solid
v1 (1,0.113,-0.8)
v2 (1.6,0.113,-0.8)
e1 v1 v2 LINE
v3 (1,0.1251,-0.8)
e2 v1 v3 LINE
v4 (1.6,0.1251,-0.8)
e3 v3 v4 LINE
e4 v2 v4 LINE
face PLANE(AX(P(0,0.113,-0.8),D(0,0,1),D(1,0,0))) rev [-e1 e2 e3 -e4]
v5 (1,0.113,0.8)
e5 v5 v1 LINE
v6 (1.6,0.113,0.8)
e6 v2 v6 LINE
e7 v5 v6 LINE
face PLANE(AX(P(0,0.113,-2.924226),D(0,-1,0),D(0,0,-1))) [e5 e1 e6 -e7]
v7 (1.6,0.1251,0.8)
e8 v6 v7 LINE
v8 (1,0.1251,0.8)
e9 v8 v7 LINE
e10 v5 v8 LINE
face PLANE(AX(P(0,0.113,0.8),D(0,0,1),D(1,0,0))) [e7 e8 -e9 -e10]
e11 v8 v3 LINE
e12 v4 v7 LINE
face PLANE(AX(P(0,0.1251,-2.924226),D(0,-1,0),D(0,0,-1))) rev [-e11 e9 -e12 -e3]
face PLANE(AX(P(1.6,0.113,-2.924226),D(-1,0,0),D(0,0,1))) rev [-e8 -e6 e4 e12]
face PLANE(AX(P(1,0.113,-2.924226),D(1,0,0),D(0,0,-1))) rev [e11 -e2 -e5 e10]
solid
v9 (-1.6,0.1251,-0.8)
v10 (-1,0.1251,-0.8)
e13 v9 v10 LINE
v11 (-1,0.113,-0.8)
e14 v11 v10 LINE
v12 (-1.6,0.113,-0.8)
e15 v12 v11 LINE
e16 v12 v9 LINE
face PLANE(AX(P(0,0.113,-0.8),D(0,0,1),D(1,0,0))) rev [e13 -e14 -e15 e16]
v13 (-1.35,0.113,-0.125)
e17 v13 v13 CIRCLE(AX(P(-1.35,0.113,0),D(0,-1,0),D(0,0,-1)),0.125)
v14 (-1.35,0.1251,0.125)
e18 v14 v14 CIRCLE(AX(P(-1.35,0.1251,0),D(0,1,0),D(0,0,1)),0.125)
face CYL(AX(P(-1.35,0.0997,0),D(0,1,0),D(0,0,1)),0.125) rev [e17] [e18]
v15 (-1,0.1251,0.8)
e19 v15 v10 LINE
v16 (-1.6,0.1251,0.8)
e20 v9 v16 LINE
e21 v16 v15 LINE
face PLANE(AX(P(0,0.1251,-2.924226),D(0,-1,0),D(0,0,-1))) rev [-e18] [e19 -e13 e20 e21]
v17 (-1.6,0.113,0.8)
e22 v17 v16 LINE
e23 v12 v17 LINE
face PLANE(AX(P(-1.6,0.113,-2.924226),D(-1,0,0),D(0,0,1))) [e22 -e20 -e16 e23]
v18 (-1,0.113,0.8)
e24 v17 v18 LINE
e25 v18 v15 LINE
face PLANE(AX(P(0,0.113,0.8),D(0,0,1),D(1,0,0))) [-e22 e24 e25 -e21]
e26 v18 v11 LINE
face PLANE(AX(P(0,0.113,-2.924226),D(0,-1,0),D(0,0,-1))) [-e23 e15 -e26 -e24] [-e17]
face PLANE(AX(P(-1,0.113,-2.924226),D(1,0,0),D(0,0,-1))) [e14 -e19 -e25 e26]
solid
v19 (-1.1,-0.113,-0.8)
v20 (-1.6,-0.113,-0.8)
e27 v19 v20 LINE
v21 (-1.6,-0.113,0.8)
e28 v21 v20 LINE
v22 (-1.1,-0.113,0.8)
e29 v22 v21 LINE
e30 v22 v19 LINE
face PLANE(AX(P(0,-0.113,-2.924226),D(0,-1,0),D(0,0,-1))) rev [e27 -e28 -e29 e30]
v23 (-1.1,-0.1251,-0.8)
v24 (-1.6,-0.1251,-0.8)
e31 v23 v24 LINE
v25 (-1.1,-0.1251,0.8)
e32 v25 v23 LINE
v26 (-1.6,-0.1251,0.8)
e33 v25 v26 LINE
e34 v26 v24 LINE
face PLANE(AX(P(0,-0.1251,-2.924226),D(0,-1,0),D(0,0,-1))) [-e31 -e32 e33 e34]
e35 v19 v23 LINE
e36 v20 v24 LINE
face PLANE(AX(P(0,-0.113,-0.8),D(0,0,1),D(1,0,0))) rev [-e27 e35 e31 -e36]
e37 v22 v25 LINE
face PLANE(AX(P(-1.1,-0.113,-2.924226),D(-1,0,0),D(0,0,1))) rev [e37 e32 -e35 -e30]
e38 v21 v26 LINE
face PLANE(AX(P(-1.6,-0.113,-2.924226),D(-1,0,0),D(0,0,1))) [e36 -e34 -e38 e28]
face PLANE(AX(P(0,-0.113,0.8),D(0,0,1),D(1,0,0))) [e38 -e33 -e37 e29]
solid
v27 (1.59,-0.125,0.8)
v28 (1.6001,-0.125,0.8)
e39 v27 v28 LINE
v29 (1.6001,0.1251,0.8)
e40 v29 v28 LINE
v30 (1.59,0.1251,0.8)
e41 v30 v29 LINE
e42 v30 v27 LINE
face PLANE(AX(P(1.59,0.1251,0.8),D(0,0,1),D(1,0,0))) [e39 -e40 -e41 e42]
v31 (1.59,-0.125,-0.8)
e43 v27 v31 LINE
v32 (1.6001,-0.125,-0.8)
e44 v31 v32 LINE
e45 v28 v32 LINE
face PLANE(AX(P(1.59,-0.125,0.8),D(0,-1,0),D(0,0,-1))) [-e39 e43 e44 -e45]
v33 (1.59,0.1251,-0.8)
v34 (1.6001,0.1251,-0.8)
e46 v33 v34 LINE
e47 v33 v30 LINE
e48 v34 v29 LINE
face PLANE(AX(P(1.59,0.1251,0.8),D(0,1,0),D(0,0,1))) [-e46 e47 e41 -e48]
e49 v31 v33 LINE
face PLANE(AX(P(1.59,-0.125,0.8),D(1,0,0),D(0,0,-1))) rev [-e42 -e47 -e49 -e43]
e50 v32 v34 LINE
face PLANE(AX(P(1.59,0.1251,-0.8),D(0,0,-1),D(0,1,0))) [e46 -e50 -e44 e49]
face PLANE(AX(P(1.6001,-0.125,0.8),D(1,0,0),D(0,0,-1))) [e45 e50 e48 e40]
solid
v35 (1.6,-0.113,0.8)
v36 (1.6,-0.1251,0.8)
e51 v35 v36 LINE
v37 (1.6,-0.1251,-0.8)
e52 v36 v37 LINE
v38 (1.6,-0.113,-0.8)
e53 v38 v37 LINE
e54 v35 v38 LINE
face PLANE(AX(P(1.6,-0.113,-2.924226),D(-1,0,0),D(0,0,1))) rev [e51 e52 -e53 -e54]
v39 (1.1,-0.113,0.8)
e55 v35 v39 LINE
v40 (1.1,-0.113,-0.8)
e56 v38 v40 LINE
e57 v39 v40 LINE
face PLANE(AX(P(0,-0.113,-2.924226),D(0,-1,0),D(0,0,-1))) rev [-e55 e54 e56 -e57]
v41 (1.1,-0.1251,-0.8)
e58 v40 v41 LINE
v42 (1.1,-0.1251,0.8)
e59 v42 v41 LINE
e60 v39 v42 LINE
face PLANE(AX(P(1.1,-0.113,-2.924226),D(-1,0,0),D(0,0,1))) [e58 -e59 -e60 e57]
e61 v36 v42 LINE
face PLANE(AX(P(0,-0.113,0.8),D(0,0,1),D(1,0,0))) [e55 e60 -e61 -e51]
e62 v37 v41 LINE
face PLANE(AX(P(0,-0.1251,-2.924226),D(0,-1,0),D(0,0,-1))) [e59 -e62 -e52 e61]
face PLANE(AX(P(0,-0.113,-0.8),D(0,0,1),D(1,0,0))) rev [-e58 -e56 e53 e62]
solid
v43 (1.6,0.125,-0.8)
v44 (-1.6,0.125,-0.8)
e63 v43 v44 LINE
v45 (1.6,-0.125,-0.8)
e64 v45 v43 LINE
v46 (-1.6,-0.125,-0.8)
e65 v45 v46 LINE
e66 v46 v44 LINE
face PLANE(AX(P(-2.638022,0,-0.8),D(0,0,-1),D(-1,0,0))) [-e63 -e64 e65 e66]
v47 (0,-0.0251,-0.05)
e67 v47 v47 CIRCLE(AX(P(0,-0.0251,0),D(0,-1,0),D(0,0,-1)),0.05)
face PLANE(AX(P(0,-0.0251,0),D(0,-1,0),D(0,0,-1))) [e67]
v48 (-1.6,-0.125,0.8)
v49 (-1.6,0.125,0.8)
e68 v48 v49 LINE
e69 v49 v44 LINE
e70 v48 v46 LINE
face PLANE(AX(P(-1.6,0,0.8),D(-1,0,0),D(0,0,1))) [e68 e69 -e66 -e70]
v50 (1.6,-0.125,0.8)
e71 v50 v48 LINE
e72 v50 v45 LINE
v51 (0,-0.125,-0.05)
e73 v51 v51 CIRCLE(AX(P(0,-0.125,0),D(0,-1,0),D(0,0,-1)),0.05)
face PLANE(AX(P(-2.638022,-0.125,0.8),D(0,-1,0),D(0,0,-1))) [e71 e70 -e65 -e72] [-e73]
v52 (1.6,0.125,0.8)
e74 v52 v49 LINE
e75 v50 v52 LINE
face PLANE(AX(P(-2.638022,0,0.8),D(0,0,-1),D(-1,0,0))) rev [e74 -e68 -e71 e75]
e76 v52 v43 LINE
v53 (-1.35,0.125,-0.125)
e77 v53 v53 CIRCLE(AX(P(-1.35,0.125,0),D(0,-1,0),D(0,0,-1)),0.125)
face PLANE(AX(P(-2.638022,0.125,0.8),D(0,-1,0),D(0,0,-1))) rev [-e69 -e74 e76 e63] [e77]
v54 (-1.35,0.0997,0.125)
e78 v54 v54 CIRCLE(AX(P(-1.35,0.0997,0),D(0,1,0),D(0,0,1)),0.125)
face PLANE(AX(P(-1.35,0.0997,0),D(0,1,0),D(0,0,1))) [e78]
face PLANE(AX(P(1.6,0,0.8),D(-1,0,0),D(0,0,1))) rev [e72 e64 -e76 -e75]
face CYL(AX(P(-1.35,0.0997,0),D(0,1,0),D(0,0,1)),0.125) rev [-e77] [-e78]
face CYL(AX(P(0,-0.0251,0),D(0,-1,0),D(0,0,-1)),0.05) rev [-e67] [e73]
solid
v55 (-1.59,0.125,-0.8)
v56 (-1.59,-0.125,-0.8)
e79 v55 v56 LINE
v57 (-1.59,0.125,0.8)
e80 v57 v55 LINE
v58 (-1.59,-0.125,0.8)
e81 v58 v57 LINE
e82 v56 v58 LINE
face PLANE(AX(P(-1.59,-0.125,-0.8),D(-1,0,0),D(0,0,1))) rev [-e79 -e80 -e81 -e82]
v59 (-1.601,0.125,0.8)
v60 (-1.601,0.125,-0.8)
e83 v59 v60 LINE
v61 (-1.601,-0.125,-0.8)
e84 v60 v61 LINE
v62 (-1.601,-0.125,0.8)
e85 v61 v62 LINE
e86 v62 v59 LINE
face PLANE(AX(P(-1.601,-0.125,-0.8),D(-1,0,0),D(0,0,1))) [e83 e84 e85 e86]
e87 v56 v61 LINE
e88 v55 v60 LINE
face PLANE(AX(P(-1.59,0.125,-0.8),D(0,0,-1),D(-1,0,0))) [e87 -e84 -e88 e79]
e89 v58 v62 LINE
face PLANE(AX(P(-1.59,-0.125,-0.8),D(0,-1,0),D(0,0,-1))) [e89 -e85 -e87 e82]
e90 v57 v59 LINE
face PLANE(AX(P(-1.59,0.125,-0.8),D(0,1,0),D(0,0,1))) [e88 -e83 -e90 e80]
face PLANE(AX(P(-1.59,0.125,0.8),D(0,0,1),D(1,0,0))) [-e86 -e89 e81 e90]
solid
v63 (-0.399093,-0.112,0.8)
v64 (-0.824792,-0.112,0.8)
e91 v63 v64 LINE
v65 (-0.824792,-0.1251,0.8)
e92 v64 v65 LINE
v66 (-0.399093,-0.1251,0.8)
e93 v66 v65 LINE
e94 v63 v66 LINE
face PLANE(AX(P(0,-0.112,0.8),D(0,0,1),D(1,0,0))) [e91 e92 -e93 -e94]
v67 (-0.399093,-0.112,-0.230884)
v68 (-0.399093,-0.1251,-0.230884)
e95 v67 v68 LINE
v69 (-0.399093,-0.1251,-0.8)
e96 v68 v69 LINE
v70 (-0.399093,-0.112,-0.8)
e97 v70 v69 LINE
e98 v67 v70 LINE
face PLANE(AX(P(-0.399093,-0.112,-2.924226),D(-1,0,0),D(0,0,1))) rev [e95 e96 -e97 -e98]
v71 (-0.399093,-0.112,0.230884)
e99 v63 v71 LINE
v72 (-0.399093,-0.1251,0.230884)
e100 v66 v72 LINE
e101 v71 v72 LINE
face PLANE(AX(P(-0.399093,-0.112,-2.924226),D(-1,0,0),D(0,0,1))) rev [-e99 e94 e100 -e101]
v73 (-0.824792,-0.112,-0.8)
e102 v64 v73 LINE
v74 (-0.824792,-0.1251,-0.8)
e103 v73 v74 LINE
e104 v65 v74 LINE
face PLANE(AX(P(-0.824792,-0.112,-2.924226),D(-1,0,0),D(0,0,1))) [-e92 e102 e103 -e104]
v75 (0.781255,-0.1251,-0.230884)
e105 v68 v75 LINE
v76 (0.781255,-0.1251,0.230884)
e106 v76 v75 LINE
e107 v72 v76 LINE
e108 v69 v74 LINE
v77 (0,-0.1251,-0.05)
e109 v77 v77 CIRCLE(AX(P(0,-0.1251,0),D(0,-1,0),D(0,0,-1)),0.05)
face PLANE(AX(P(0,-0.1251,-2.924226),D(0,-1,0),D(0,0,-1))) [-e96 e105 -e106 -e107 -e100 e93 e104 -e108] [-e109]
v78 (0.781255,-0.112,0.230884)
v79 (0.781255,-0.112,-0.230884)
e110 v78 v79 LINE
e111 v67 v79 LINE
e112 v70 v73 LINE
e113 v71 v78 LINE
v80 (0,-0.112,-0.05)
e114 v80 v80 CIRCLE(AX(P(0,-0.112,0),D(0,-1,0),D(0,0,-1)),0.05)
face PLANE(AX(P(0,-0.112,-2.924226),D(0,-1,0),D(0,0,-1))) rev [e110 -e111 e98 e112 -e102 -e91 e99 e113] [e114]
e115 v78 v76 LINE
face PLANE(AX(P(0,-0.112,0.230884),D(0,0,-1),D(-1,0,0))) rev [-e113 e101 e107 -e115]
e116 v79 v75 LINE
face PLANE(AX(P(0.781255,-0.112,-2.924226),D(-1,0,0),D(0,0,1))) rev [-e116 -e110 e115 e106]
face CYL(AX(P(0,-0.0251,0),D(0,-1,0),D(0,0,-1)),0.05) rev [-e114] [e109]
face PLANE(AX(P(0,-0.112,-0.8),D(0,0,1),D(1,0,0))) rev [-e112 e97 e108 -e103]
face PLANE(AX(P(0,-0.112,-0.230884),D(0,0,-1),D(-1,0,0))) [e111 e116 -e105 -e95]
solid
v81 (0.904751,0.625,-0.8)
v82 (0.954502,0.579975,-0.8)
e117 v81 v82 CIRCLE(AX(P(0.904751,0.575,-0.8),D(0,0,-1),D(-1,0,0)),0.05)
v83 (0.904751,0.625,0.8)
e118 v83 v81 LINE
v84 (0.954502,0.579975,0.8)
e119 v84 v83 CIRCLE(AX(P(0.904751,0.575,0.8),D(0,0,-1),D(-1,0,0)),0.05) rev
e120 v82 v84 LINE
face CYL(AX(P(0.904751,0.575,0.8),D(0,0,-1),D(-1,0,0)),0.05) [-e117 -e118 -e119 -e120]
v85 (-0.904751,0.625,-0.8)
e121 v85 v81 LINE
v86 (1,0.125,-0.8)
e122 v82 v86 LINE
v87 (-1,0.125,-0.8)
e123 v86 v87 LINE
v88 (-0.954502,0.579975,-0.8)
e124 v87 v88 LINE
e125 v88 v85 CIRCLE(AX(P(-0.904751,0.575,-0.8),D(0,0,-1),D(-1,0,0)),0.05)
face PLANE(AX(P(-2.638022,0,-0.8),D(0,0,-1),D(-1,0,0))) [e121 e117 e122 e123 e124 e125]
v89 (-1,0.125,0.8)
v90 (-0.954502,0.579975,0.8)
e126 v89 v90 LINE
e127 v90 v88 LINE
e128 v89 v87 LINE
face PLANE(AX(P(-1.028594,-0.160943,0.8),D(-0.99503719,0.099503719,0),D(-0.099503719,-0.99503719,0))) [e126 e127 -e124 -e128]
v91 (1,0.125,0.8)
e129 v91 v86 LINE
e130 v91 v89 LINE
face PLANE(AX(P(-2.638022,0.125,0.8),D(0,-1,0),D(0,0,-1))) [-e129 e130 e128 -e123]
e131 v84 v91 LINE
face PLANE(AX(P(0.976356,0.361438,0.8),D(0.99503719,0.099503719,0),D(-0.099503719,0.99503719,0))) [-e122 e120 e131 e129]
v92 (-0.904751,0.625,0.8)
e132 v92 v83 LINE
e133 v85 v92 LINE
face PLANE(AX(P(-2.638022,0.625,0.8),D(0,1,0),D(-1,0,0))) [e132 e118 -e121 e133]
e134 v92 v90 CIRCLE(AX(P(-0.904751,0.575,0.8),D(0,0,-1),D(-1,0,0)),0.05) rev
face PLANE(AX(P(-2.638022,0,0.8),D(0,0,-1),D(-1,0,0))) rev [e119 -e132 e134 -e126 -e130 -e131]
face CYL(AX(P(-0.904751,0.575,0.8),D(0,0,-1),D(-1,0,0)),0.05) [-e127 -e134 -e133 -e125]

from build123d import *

# Parameters (mm, degrees)
SKETCH1_W                  = 3.2
SKETCH1_H                  = 0.25
EXTRUDE1_DEPTH             = 0.8
EXTRUDE2_DEPTH             = 0.8
EXTRUDE3_START             = -0.013
EXTRUDE3_DEPTH             = 0.0131
EXTRUDE4_DEPTH             = 0.0001
EXTRUDE4_DEPTH_BACK        = 0.012
SKETCH2_3_W                = 0.5
SKETCH2_3_H                = 1.6
EXTRUDE4_2_DEPTH           = 0.0001
EXTRUDE4_2_DEPTH_BACK      = 0.012
EXTRUDE5_DEPTH             = 0.0001
EXTRUDE5_DEPTH_BACK        = 0.012
SKETCH3_W                  = 0.6
SKETCH3_H                  = 1.6
EXTRUDE5_2_DEPTH           = 0.0001
EXTRUDE5_2_DEPTH_BACK      = 0.012
FILLET1_R                  = 0.05
EXTRUDE6_DEPTH             = 0.0001
EXTRUDE6_DEPTH_BACK        = 0.01
SKETCH5_W                  = 1.6
SKETCH5_H                  = 0.2501
EXTRUDE7_DEPTH             = 0.001
EXTRUDE7_DEPTH_BACK        = 0.01
SKETCH6_W                  = 1.6
SKETCH6_H                  = 0.25
SKETCH8_R                  = 0.05
EXTRUDE_PWB_LOCATION_DEPTH = 0.1
SKETCH9_R                  = 0.125
CUT_EXTRUDE2_DEPTH         = 0.0254


# Read off the part's stored shape, not the designer's step: Extrude3
with BuildPart() as part:
    # Sketch1 → Extrude1 (new, symmetric)
    with BuildSketch(Plane.XY):
        Rectangle(SKETCH1_W, SKETCH1_H)
    extrude(amount=EXTRUDE1_DEPTH, both=True)


with BuildPart() as body_2:
    # Sketch1<3> → Extrude2 (new, symmetric)
    with BuildSketch(Plane.XY):
        Polygon((-0.95, 0.625), (-1, 0.125), (1, 0.125), (0.95, 0.625), align=None)
    extrude(amount=EXTRUDE2_DEPTH, both=True)

    # Fillet1
    fillet1_edges = [body_2.edges().sort_by_distance(p)[0] for p in [
        (0.95, 0.625, 0),
        (-0.95, 0.625, 0),
    ]]
    fillet(fillet1_edges, radius=FILLET1_R)


with BuildPart() as body_3:
    # Extrude3 outline → Extrude3 (new body)
    with BuildSketch(Plane.XZ.offset(0.125).offset(EXTRUDE3_START)):
        Polygon((-0.399092971, 0.230883574), (-0.399092971, 0.8), (-0.824792139, 0.8), (-0.824792139, -0.8), (-0.399092971, -0.8), (-0.399092971, -0.230883574), (0.781254724, -0.230883574), (0.781254724, 0.230883574), align=None)
    extrude(amount=EXTRUDE3_DEPTH)


with BuildPart() as body_4:
    # Sketch2<3> → Extrude4 (new, two sides: drawn at the far end of the back side and taken through both)
    with BuildSketch(Plane.XZ.offset(0.125).offset(-EXTRUDE4_DEPTH_BACK)):
        with Locations((-1.35, 0)):
            Rectangle(SKETCH2_3_W, SKETCH2_3_H)
    extrude(amount=EXTRUDE4_DEPTH + EXTRUDE4_DEPTH_BACK)


with BuildPart() as body_5:
    # Sketch2<3> → Extrude4 2 (new, two sides: drawn at the far end of the back side and taken through both)
    with BuildSketch(Plane.XZ.offset(0.125).offset(-EXTRUDE4_2_DEPTH_BACK)):
        with Locations((1.35, 0)):
            Rectangle(SKETCH2_3_W, SKETCH2_3_H)
    extrude(amount=EXTRUDE4_2_DEPTH + EXTRUDE4_2_DEPTH_BACK)


with BuildPart() as body_6:
    # Sketch3 → Extrude5 (new, two sides: drawn at the far end of the back side and taken through both)
    with BuildSketch(Plane(origin=(0, 0.125, 0), x_dir=(-1, 0, 0), z_dir=(0, 1, 0)).offset(-EXTRUDE5_DEPTH_BACK)):
        with Locations((1.3, 0)):
            Rectangle(SKETCH3_W, SKETCH3_H)
    extrude(amount=EXTRUDE5_DEPTH + EXTRUDE5_DEPTH_BACK)


with BuildPart() as body_7:
    # Sketch3 → Extrude5 2 (new, two sides: drawn at the far end of the back side and taken through both)
    with BuildSketch(Plane(origin=(0, 0.125, 0), x_dir=(-1, 0, 0), z_dir=(0, 1, 0)).offset(-EXTRUDE5_2_DEPTH_BACK)):
        with Locations((-1.3, 0)):
            Rectangle(SKETCH3_W, SKETCH3_H)
    extrude(amount=EXTRUDE5_2_DEPTH + EXTRUDE5_2_DEPTH_BACK)


with BuildPart() as body_8:
    # Sketch5 → Extrude6 (new, two sides: drawn at the far end of the back side and taken through both)
    with BuildSketch(Plane(origin=(1.6, 0, 0), x_dir=(0, 0, -1), z_dir=(1, 0, 0)).offset(-EXTRUDE6_DEPTH_BACK)):
        with Locations((0, 5e-05)):
            Rectangle(SKETCH5_W, SKETCH5_H)
    extrude(amount=EXTRUDE6_DEPTH + EXTRUDE6_DEPTH_BACK)


with BuildPart() as body_9:
    # Sketch6 → Extrude7 (new, two sides: drawn at the far end of the back side and taken through both)
    with BuildSketch(Plane.ZY.offset(1.6).offset(-EXTRUDE7_DEPTH_BACK)):
        Rectangle(SKETCH6_W, SKETCH6_H)
    extrude(amount=EXTRUDE7_DEPTH + EXTRUDE7_DEPTH_BACK)


with BuildPart() as extrude_pwb_location_tool:
    # Sketch8 → Extrude PWB Location (new body)
    with BuildSketch(Plane.XZ.offset(0.1251)):
        with Locations(Location((0, 0, 0), (0, 0, 270))):
            Circle(SKETCH8_R)
    extrude(amount=-EXTRUDE_PWB_LOCATION_DEPTH)


with BuildPart() as part_1:
    add(part.part)

    # Extrude PWB Location: cut by extrude_pwb_location_tool
    add(extrude_pwb_location_tool.part, mode=Mode.SUBTRACT)


with BuildPart() as body_3_1:
    add(body_3.part)

    # Extrude PWB Location: cut by extrude_pwb_location_tool
    add(extrude_pwb_location_tool.part, mode=Mode.SUBTRACT)


with BuildPart() as cut_extrude2_tool:
    # Sketch9 → Cut-Extrude2 (new body)
    with BuildSketch(Plane(origin=(0, 0.1251, 0), x_dir=(1, 0, 0), z_dir=(0, 1, 0))):
        with Locations(Location((-1.35, 0, 0), (0, 0, 270))):
            Circle(SKETCH9_R)
    extrude(amount=-CUT_EXTRUDE2_DEPTH)


with BuildPart() as part_2:
    add(part_1.part)

    # Cut-Extrude2: cut by cut_extrude2_tool
    add(cut_extrude2_tool.part, mode=Mode.SUBTRACT)


with BuildPart() as body_6_1:
    add(body_6.part)

    # Cut-Extrude2: cut by cut_extrude2_tool
    add(cut_extrude2_tool.part, mode=Mode.SUBTRACT)


solid = Compound([body_2.part, body_4.part, body_5.part, body_7.part, body_8.part, body_9.part, body_3_1.part, part_2.part, body_6_1.part])
